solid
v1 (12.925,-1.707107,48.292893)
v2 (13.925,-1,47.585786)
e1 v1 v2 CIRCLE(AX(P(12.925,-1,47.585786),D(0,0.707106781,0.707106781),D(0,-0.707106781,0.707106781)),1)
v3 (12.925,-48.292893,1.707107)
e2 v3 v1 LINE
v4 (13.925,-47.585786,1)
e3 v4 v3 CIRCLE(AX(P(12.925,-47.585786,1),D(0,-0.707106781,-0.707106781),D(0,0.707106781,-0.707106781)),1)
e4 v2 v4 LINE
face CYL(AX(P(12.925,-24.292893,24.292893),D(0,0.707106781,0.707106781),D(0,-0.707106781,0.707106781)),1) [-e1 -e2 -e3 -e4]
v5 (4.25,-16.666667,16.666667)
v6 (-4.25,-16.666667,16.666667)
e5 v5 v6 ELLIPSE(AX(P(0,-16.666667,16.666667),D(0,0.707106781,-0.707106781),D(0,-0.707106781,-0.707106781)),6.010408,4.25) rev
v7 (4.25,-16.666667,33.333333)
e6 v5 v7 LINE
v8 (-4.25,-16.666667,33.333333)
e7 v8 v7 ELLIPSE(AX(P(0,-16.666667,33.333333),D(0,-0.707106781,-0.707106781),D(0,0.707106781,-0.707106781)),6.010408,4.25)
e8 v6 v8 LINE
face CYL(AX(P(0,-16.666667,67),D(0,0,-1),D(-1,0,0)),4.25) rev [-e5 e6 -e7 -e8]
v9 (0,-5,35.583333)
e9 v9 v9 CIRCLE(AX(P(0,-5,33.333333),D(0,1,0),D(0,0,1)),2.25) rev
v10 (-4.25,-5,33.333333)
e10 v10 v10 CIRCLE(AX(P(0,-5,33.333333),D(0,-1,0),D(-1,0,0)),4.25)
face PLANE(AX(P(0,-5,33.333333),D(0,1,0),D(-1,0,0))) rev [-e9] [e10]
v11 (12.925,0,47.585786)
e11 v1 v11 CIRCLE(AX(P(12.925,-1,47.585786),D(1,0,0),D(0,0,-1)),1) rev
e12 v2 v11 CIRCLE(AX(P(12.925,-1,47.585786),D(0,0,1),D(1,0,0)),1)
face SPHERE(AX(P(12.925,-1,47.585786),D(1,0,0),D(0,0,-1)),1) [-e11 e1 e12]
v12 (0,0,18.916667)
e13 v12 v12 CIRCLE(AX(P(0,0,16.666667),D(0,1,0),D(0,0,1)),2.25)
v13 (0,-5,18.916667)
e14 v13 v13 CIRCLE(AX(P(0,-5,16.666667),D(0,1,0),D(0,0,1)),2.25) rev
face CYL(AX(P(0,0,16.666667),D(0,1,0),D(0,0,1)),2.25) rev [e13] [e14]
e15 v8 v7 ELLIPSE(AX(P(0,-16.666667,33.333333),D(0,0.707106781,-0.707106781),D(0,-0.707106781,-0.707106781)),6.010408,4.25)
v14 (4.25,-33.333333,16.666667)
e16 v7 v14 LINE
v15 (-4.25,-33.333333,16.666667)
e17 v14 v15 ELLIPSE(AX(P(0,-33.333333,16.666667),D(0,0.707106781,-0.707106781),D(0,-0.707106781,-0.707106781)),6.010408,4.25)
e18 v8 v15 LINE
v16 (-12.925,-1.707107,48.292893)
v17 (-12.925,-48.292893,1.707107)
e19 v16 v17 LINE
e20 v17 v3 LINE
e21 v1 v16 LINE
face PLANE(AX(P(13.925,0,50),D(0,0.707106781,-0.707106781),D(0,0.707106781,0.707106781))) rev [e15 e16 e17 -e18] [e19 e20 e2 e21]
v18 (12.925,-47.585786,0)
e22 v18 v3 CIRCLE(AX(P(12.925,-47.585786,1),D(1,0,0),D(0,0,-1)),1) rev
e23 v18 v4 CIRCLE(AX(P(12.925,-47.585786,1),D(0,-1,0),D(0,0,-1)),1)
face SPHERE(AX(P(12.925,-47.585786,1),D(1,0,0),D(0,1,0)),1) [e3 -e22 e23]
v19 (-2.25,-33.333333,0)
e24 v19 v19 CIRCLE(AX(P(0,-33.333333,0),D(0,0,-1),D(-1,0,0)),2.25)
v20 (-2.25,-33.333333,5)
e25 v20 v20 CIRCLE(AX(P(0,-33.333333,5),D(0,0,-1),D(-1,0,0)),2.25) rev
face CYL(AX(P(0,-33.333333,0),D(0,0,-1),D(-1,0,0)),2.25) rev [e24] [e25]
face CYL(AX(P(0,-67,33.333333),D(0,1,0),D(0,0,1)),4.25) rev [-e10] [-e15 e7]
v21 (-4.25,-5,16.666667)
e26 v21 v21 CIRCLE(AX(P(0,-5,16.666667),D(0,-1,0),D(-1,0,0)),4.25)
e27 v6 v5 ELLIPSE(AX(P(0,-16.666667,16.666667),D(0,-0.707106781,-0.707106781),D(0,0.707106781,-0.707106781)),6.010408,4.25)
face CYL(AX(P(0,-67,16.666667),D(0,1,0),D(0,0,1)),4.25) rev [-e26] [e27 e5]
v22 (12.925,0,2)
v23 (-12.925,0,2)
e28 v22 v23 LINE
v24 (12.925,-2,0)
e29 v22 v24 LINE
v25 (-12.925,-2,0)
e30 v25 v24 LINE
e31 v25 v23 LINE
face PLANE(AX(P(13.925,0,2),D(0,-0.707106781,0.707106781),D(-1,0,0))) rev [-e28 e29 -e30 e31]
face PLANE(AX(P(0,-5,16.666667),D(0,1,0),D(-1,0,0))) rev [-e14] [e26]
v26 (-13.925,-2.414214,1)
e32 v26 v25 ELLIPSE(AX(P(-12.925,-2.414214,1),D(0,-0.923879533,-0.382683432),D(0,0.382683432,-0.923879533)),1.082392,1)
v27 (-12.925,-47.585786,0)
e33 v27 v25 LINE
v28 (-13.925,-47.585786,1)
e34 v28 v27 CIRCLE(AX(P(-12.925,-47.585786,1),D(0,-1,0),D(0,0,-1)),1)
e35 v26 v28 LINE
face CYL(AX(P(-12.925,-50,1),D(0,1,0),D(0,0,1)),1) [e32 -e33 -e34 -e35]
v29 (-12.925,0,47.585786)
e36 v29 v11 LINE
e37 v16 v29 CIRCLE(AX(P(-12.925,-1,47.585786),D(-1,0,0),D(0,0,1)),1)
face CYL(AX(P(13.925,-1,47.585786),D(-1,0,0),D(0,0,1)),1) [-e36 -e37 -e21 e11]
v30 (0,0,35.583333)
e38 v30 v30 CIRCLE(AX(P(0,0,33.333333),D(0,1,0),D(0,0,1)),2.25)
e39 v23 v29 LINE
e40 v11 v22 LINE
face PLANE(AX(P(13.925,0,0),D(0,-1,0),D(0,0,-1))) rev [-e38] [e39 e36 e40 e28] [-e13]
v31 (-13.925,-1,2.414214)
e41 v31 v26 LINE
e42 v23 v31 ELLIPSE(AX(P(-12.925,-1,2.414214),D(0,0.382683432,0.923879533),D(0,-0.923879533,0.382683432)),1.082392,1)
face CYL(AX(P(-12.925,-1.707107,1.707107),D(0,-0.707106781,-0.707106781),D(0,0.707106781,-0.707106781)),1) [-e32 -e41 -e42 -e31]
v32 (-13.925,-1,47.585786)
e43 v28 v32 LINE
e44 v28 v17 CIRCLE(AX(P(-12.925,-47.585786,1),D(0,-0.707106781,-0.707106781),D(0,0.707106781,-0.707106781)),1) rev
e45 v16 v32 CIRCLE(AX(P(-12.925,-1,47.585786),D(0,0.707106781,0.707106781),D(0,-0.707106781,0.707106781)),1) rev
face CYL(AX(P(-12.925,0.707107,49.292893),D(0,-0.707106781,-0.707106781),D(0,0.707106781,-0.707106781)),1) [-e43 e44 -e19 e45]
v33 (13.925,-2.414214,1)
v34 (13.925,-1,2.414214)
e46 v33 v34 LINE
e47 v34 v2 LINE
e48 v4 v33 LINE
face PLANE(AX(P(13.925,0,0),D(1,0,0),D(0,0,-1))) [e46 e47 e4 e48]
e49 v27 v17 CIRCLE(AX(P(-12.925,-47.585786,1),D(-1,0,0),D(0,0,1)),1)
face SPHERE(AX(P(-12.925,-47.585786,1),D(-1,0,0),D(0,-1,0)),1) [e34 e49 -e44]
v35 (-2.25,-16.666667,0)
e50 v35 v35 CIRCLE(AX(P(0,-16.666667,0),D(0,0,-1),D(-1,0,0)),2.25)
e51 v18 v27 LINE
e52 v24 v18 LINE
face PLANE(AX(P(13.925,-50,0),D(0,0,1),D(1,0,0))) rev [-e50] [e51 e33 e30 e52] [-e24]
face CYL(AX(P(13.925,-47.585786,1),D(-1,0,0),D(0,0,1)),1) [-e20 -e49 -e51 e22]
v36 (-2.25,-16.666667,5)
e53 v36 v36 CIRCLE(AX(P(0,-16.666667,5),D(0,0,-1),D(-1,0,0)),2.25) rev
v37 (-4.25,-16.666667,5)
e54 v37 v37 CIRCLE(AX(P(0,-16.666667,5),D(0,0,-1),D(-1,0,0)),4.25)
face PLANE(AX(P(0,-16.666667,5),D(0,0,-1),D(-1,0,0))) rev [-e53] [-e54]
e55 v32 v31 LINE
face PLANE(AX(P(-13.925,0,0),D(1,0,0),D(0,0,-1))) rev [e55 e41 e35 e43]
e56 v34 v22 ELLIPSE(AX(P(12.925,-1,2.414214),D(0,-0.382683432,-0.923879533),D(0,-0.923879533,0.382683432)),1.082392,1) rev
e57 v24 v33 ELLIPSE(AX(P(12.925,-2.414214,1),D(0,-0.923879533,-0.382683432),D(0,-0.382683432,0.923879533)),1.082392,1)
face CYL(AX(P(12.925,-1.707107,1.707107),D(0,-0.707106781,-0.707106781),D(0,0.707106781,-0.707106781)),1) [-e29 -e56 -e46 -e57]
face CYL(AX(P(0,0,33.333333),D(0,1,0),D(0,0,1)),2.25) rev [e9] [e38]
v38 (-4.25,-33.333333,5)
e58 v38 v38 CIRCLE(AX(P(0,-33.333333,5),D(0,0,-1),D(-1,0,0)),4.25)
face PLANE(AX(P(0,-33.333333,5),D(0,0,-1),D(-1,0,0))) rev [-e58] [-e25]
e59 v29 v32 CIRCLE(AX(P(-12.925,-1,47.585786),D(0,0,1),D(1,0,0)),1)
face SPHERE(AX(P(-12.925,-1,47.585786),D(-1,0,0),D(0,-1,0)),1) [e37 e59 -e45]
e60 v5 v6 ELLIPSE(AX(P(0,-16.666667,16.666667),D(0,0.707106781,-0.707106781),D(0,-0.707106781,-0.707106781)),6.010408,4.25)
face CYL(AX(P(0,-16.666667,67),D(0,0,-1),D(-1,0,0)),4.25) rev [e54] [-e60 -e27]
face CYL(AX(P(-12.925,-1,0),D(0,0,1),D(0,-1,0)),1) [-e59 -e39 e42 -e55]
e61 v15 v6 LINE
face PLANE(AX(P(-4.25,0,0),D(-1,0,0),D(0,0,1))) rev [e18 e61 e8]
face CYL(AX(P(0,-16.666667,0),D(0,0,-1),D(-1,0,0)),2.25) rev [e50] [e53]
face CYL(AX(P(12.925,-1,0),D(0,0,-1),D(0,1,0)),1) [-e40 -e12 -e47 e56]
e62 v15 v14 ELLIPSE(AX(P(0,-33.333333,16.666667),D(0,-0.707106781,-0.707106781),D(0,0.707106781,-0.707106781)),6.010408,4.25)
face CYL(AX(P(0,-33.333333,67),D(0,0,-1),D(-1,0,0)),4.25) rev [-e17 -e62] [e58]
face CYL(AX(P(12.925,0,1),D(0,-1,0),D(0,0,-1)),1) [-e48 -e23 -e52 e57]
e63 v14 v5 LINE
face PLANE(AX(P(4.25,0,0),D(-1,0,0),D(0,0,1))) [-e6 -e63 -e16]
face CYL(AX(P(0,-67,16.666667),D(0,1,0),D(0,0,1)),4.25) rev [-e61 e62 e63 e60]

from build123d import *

# Parameters (mm, degrees)
BOSS_EXTRUDE1_DEPTH  = 13.925
M4_CLEARANCE_HOLE1_D = 4.5
CUT_EXTRUDE1_START   = -5
SKETCH7_R            = 4.25
CUT_EXTRUDE1_DEPTH   = 62
CHAMFER1_SIZE        = 2
MIRROR1_START        = -33.333333
MIRROR1_OUTLINE_R    = 4.25
MIRROR1_DEPTH        = 28.333333
MIRROR1_START_2      = -5
MIRROR1_2_OUTLINE_R  = 2.25
MIRROR1_2_DEPTH      = 5
CUT_EXTRUDE4_START   = -18.175
CUT_EXTRUDE4_DEPTH   = 8.5
FILLET1_R            = 1


# Read off the part's stored shape, not the designer's step: Mirror1
with BuildPart() as part:
    # Sketch1 → Boss-Extrude1 (new, symmetric)
    with BuildSketch(Plane(origin=(0, 0, 0), x_dir=(0, 0, -1), z_dir=(1, 0, 0))):
        Polygon((0, 0), (-50, 0), (0, -50), align=None)
    extrude(amount=BOSS_EXTRUDE1_DEPTH, both=True)

    # M4 Clearance Hole1 (through all)
    with Locations(Plane(origin=(0, 0, 0), x_dir=(-1, 0, 0), z_dir=(0, 0, -1))):
        with Locations((0, -16.666667), (0, -33.333333)):
            Hole(M4_CLEARANCE_HOLE1_D / 2)

    # Sketch7 → Cut-Extrude1 (cut)
    with BuildSketch(Plane(origin=(0, 0, 0), x_dir=(-1, 0, 0), z_dir=(0, 0, -1)).offset(CUT_EXTRUDE1_START)):
        with Locations((0, -16.666667)):
            Circle(SKETCH7_R)
        with Locations((0, -33.333333)):
            Circle(SKETCH7_R)
    extrude(amount=-CUT_EXTRUDE1_DEPTH, mode=Mode.SUBTRACT)

    # Chamfer1
    chamfer1_edges = [part.edges().sort_by_distance(p)[0] for p in [
        (0, 0, 0),
    ]]
    chamfer(chamfer1_edges, length=CHAMFER1_SIZE)

    # Mirror1 outline → Mirror1 (cut)
    with BuildSketch(Plane(origin=(0, 0, 0), x_dir=(1, 0, 0), z_dir=(0, 1, 0)).offset(MIRROR1_START)):
        with Locations((0, -33.333333)):
            Circle(MIRROR1_OUTLINE_R)
        with Locations((0, -16.666667)):
            Circle(MIRROR1_OUTLINE_R)
    extrude(amount=MIRROR1_DEPTH, mode=Mode.SUBTRACT)

    # Mirror1 2 outline → Mirror1 2 (cut)
    with BuildSketch(Plane(origin=(0, 0, 0), x_dir=(1, 0, 0), z_dir=(0, 1, 0)).offset(MIRROR1_START_2)):
        with Locations((0, -33.333333)):
            Circle(MIRROR1_2_OUTLINE_R)
        with Locations((0, -16.666667)):
            Circle(MIRROR1_2_OUTLINE_R)
    extrude(amount=MIRROR1_2_DEPTH, mode=Mode.SUBTRACT)

    # Sketch8 → Cut-Extrude4 (cut)
    with BuildSketch(Plane(origin=(13.925, 0, 0), x_dir=(0, 0, -1), z_dir=(1, 0, 0)).offset(CUT_EXTRUDE4_START)):
        Polygon((-33.333333, -16.666667), (-16.666667, -16.666667), (-16.666667, -33.333333), align=None)
    extrude(amount=CUT_EXTRUDE4_DEPTH, mode=Mode.SUBTRACT)

    # Fillet1
    fillet1_edges = [part.edges().sort_by_distance(p)[0] for p in [
        (13.925, -25, 25),
        (-13.925, 0, 26),
        (13.925, 0, 26),
        (-13.925, -1, 1),
        (-13.925, -25, 25),
        (13.925, -1, 1),
        (-13.925, -26, 0),
        (13.925, -26, 0),
        (0, -50, 0),
        (0, 0, 50),
    ]]
    fillet(fillet1_edges, radius=FILLET1_R)


solid = part.part
